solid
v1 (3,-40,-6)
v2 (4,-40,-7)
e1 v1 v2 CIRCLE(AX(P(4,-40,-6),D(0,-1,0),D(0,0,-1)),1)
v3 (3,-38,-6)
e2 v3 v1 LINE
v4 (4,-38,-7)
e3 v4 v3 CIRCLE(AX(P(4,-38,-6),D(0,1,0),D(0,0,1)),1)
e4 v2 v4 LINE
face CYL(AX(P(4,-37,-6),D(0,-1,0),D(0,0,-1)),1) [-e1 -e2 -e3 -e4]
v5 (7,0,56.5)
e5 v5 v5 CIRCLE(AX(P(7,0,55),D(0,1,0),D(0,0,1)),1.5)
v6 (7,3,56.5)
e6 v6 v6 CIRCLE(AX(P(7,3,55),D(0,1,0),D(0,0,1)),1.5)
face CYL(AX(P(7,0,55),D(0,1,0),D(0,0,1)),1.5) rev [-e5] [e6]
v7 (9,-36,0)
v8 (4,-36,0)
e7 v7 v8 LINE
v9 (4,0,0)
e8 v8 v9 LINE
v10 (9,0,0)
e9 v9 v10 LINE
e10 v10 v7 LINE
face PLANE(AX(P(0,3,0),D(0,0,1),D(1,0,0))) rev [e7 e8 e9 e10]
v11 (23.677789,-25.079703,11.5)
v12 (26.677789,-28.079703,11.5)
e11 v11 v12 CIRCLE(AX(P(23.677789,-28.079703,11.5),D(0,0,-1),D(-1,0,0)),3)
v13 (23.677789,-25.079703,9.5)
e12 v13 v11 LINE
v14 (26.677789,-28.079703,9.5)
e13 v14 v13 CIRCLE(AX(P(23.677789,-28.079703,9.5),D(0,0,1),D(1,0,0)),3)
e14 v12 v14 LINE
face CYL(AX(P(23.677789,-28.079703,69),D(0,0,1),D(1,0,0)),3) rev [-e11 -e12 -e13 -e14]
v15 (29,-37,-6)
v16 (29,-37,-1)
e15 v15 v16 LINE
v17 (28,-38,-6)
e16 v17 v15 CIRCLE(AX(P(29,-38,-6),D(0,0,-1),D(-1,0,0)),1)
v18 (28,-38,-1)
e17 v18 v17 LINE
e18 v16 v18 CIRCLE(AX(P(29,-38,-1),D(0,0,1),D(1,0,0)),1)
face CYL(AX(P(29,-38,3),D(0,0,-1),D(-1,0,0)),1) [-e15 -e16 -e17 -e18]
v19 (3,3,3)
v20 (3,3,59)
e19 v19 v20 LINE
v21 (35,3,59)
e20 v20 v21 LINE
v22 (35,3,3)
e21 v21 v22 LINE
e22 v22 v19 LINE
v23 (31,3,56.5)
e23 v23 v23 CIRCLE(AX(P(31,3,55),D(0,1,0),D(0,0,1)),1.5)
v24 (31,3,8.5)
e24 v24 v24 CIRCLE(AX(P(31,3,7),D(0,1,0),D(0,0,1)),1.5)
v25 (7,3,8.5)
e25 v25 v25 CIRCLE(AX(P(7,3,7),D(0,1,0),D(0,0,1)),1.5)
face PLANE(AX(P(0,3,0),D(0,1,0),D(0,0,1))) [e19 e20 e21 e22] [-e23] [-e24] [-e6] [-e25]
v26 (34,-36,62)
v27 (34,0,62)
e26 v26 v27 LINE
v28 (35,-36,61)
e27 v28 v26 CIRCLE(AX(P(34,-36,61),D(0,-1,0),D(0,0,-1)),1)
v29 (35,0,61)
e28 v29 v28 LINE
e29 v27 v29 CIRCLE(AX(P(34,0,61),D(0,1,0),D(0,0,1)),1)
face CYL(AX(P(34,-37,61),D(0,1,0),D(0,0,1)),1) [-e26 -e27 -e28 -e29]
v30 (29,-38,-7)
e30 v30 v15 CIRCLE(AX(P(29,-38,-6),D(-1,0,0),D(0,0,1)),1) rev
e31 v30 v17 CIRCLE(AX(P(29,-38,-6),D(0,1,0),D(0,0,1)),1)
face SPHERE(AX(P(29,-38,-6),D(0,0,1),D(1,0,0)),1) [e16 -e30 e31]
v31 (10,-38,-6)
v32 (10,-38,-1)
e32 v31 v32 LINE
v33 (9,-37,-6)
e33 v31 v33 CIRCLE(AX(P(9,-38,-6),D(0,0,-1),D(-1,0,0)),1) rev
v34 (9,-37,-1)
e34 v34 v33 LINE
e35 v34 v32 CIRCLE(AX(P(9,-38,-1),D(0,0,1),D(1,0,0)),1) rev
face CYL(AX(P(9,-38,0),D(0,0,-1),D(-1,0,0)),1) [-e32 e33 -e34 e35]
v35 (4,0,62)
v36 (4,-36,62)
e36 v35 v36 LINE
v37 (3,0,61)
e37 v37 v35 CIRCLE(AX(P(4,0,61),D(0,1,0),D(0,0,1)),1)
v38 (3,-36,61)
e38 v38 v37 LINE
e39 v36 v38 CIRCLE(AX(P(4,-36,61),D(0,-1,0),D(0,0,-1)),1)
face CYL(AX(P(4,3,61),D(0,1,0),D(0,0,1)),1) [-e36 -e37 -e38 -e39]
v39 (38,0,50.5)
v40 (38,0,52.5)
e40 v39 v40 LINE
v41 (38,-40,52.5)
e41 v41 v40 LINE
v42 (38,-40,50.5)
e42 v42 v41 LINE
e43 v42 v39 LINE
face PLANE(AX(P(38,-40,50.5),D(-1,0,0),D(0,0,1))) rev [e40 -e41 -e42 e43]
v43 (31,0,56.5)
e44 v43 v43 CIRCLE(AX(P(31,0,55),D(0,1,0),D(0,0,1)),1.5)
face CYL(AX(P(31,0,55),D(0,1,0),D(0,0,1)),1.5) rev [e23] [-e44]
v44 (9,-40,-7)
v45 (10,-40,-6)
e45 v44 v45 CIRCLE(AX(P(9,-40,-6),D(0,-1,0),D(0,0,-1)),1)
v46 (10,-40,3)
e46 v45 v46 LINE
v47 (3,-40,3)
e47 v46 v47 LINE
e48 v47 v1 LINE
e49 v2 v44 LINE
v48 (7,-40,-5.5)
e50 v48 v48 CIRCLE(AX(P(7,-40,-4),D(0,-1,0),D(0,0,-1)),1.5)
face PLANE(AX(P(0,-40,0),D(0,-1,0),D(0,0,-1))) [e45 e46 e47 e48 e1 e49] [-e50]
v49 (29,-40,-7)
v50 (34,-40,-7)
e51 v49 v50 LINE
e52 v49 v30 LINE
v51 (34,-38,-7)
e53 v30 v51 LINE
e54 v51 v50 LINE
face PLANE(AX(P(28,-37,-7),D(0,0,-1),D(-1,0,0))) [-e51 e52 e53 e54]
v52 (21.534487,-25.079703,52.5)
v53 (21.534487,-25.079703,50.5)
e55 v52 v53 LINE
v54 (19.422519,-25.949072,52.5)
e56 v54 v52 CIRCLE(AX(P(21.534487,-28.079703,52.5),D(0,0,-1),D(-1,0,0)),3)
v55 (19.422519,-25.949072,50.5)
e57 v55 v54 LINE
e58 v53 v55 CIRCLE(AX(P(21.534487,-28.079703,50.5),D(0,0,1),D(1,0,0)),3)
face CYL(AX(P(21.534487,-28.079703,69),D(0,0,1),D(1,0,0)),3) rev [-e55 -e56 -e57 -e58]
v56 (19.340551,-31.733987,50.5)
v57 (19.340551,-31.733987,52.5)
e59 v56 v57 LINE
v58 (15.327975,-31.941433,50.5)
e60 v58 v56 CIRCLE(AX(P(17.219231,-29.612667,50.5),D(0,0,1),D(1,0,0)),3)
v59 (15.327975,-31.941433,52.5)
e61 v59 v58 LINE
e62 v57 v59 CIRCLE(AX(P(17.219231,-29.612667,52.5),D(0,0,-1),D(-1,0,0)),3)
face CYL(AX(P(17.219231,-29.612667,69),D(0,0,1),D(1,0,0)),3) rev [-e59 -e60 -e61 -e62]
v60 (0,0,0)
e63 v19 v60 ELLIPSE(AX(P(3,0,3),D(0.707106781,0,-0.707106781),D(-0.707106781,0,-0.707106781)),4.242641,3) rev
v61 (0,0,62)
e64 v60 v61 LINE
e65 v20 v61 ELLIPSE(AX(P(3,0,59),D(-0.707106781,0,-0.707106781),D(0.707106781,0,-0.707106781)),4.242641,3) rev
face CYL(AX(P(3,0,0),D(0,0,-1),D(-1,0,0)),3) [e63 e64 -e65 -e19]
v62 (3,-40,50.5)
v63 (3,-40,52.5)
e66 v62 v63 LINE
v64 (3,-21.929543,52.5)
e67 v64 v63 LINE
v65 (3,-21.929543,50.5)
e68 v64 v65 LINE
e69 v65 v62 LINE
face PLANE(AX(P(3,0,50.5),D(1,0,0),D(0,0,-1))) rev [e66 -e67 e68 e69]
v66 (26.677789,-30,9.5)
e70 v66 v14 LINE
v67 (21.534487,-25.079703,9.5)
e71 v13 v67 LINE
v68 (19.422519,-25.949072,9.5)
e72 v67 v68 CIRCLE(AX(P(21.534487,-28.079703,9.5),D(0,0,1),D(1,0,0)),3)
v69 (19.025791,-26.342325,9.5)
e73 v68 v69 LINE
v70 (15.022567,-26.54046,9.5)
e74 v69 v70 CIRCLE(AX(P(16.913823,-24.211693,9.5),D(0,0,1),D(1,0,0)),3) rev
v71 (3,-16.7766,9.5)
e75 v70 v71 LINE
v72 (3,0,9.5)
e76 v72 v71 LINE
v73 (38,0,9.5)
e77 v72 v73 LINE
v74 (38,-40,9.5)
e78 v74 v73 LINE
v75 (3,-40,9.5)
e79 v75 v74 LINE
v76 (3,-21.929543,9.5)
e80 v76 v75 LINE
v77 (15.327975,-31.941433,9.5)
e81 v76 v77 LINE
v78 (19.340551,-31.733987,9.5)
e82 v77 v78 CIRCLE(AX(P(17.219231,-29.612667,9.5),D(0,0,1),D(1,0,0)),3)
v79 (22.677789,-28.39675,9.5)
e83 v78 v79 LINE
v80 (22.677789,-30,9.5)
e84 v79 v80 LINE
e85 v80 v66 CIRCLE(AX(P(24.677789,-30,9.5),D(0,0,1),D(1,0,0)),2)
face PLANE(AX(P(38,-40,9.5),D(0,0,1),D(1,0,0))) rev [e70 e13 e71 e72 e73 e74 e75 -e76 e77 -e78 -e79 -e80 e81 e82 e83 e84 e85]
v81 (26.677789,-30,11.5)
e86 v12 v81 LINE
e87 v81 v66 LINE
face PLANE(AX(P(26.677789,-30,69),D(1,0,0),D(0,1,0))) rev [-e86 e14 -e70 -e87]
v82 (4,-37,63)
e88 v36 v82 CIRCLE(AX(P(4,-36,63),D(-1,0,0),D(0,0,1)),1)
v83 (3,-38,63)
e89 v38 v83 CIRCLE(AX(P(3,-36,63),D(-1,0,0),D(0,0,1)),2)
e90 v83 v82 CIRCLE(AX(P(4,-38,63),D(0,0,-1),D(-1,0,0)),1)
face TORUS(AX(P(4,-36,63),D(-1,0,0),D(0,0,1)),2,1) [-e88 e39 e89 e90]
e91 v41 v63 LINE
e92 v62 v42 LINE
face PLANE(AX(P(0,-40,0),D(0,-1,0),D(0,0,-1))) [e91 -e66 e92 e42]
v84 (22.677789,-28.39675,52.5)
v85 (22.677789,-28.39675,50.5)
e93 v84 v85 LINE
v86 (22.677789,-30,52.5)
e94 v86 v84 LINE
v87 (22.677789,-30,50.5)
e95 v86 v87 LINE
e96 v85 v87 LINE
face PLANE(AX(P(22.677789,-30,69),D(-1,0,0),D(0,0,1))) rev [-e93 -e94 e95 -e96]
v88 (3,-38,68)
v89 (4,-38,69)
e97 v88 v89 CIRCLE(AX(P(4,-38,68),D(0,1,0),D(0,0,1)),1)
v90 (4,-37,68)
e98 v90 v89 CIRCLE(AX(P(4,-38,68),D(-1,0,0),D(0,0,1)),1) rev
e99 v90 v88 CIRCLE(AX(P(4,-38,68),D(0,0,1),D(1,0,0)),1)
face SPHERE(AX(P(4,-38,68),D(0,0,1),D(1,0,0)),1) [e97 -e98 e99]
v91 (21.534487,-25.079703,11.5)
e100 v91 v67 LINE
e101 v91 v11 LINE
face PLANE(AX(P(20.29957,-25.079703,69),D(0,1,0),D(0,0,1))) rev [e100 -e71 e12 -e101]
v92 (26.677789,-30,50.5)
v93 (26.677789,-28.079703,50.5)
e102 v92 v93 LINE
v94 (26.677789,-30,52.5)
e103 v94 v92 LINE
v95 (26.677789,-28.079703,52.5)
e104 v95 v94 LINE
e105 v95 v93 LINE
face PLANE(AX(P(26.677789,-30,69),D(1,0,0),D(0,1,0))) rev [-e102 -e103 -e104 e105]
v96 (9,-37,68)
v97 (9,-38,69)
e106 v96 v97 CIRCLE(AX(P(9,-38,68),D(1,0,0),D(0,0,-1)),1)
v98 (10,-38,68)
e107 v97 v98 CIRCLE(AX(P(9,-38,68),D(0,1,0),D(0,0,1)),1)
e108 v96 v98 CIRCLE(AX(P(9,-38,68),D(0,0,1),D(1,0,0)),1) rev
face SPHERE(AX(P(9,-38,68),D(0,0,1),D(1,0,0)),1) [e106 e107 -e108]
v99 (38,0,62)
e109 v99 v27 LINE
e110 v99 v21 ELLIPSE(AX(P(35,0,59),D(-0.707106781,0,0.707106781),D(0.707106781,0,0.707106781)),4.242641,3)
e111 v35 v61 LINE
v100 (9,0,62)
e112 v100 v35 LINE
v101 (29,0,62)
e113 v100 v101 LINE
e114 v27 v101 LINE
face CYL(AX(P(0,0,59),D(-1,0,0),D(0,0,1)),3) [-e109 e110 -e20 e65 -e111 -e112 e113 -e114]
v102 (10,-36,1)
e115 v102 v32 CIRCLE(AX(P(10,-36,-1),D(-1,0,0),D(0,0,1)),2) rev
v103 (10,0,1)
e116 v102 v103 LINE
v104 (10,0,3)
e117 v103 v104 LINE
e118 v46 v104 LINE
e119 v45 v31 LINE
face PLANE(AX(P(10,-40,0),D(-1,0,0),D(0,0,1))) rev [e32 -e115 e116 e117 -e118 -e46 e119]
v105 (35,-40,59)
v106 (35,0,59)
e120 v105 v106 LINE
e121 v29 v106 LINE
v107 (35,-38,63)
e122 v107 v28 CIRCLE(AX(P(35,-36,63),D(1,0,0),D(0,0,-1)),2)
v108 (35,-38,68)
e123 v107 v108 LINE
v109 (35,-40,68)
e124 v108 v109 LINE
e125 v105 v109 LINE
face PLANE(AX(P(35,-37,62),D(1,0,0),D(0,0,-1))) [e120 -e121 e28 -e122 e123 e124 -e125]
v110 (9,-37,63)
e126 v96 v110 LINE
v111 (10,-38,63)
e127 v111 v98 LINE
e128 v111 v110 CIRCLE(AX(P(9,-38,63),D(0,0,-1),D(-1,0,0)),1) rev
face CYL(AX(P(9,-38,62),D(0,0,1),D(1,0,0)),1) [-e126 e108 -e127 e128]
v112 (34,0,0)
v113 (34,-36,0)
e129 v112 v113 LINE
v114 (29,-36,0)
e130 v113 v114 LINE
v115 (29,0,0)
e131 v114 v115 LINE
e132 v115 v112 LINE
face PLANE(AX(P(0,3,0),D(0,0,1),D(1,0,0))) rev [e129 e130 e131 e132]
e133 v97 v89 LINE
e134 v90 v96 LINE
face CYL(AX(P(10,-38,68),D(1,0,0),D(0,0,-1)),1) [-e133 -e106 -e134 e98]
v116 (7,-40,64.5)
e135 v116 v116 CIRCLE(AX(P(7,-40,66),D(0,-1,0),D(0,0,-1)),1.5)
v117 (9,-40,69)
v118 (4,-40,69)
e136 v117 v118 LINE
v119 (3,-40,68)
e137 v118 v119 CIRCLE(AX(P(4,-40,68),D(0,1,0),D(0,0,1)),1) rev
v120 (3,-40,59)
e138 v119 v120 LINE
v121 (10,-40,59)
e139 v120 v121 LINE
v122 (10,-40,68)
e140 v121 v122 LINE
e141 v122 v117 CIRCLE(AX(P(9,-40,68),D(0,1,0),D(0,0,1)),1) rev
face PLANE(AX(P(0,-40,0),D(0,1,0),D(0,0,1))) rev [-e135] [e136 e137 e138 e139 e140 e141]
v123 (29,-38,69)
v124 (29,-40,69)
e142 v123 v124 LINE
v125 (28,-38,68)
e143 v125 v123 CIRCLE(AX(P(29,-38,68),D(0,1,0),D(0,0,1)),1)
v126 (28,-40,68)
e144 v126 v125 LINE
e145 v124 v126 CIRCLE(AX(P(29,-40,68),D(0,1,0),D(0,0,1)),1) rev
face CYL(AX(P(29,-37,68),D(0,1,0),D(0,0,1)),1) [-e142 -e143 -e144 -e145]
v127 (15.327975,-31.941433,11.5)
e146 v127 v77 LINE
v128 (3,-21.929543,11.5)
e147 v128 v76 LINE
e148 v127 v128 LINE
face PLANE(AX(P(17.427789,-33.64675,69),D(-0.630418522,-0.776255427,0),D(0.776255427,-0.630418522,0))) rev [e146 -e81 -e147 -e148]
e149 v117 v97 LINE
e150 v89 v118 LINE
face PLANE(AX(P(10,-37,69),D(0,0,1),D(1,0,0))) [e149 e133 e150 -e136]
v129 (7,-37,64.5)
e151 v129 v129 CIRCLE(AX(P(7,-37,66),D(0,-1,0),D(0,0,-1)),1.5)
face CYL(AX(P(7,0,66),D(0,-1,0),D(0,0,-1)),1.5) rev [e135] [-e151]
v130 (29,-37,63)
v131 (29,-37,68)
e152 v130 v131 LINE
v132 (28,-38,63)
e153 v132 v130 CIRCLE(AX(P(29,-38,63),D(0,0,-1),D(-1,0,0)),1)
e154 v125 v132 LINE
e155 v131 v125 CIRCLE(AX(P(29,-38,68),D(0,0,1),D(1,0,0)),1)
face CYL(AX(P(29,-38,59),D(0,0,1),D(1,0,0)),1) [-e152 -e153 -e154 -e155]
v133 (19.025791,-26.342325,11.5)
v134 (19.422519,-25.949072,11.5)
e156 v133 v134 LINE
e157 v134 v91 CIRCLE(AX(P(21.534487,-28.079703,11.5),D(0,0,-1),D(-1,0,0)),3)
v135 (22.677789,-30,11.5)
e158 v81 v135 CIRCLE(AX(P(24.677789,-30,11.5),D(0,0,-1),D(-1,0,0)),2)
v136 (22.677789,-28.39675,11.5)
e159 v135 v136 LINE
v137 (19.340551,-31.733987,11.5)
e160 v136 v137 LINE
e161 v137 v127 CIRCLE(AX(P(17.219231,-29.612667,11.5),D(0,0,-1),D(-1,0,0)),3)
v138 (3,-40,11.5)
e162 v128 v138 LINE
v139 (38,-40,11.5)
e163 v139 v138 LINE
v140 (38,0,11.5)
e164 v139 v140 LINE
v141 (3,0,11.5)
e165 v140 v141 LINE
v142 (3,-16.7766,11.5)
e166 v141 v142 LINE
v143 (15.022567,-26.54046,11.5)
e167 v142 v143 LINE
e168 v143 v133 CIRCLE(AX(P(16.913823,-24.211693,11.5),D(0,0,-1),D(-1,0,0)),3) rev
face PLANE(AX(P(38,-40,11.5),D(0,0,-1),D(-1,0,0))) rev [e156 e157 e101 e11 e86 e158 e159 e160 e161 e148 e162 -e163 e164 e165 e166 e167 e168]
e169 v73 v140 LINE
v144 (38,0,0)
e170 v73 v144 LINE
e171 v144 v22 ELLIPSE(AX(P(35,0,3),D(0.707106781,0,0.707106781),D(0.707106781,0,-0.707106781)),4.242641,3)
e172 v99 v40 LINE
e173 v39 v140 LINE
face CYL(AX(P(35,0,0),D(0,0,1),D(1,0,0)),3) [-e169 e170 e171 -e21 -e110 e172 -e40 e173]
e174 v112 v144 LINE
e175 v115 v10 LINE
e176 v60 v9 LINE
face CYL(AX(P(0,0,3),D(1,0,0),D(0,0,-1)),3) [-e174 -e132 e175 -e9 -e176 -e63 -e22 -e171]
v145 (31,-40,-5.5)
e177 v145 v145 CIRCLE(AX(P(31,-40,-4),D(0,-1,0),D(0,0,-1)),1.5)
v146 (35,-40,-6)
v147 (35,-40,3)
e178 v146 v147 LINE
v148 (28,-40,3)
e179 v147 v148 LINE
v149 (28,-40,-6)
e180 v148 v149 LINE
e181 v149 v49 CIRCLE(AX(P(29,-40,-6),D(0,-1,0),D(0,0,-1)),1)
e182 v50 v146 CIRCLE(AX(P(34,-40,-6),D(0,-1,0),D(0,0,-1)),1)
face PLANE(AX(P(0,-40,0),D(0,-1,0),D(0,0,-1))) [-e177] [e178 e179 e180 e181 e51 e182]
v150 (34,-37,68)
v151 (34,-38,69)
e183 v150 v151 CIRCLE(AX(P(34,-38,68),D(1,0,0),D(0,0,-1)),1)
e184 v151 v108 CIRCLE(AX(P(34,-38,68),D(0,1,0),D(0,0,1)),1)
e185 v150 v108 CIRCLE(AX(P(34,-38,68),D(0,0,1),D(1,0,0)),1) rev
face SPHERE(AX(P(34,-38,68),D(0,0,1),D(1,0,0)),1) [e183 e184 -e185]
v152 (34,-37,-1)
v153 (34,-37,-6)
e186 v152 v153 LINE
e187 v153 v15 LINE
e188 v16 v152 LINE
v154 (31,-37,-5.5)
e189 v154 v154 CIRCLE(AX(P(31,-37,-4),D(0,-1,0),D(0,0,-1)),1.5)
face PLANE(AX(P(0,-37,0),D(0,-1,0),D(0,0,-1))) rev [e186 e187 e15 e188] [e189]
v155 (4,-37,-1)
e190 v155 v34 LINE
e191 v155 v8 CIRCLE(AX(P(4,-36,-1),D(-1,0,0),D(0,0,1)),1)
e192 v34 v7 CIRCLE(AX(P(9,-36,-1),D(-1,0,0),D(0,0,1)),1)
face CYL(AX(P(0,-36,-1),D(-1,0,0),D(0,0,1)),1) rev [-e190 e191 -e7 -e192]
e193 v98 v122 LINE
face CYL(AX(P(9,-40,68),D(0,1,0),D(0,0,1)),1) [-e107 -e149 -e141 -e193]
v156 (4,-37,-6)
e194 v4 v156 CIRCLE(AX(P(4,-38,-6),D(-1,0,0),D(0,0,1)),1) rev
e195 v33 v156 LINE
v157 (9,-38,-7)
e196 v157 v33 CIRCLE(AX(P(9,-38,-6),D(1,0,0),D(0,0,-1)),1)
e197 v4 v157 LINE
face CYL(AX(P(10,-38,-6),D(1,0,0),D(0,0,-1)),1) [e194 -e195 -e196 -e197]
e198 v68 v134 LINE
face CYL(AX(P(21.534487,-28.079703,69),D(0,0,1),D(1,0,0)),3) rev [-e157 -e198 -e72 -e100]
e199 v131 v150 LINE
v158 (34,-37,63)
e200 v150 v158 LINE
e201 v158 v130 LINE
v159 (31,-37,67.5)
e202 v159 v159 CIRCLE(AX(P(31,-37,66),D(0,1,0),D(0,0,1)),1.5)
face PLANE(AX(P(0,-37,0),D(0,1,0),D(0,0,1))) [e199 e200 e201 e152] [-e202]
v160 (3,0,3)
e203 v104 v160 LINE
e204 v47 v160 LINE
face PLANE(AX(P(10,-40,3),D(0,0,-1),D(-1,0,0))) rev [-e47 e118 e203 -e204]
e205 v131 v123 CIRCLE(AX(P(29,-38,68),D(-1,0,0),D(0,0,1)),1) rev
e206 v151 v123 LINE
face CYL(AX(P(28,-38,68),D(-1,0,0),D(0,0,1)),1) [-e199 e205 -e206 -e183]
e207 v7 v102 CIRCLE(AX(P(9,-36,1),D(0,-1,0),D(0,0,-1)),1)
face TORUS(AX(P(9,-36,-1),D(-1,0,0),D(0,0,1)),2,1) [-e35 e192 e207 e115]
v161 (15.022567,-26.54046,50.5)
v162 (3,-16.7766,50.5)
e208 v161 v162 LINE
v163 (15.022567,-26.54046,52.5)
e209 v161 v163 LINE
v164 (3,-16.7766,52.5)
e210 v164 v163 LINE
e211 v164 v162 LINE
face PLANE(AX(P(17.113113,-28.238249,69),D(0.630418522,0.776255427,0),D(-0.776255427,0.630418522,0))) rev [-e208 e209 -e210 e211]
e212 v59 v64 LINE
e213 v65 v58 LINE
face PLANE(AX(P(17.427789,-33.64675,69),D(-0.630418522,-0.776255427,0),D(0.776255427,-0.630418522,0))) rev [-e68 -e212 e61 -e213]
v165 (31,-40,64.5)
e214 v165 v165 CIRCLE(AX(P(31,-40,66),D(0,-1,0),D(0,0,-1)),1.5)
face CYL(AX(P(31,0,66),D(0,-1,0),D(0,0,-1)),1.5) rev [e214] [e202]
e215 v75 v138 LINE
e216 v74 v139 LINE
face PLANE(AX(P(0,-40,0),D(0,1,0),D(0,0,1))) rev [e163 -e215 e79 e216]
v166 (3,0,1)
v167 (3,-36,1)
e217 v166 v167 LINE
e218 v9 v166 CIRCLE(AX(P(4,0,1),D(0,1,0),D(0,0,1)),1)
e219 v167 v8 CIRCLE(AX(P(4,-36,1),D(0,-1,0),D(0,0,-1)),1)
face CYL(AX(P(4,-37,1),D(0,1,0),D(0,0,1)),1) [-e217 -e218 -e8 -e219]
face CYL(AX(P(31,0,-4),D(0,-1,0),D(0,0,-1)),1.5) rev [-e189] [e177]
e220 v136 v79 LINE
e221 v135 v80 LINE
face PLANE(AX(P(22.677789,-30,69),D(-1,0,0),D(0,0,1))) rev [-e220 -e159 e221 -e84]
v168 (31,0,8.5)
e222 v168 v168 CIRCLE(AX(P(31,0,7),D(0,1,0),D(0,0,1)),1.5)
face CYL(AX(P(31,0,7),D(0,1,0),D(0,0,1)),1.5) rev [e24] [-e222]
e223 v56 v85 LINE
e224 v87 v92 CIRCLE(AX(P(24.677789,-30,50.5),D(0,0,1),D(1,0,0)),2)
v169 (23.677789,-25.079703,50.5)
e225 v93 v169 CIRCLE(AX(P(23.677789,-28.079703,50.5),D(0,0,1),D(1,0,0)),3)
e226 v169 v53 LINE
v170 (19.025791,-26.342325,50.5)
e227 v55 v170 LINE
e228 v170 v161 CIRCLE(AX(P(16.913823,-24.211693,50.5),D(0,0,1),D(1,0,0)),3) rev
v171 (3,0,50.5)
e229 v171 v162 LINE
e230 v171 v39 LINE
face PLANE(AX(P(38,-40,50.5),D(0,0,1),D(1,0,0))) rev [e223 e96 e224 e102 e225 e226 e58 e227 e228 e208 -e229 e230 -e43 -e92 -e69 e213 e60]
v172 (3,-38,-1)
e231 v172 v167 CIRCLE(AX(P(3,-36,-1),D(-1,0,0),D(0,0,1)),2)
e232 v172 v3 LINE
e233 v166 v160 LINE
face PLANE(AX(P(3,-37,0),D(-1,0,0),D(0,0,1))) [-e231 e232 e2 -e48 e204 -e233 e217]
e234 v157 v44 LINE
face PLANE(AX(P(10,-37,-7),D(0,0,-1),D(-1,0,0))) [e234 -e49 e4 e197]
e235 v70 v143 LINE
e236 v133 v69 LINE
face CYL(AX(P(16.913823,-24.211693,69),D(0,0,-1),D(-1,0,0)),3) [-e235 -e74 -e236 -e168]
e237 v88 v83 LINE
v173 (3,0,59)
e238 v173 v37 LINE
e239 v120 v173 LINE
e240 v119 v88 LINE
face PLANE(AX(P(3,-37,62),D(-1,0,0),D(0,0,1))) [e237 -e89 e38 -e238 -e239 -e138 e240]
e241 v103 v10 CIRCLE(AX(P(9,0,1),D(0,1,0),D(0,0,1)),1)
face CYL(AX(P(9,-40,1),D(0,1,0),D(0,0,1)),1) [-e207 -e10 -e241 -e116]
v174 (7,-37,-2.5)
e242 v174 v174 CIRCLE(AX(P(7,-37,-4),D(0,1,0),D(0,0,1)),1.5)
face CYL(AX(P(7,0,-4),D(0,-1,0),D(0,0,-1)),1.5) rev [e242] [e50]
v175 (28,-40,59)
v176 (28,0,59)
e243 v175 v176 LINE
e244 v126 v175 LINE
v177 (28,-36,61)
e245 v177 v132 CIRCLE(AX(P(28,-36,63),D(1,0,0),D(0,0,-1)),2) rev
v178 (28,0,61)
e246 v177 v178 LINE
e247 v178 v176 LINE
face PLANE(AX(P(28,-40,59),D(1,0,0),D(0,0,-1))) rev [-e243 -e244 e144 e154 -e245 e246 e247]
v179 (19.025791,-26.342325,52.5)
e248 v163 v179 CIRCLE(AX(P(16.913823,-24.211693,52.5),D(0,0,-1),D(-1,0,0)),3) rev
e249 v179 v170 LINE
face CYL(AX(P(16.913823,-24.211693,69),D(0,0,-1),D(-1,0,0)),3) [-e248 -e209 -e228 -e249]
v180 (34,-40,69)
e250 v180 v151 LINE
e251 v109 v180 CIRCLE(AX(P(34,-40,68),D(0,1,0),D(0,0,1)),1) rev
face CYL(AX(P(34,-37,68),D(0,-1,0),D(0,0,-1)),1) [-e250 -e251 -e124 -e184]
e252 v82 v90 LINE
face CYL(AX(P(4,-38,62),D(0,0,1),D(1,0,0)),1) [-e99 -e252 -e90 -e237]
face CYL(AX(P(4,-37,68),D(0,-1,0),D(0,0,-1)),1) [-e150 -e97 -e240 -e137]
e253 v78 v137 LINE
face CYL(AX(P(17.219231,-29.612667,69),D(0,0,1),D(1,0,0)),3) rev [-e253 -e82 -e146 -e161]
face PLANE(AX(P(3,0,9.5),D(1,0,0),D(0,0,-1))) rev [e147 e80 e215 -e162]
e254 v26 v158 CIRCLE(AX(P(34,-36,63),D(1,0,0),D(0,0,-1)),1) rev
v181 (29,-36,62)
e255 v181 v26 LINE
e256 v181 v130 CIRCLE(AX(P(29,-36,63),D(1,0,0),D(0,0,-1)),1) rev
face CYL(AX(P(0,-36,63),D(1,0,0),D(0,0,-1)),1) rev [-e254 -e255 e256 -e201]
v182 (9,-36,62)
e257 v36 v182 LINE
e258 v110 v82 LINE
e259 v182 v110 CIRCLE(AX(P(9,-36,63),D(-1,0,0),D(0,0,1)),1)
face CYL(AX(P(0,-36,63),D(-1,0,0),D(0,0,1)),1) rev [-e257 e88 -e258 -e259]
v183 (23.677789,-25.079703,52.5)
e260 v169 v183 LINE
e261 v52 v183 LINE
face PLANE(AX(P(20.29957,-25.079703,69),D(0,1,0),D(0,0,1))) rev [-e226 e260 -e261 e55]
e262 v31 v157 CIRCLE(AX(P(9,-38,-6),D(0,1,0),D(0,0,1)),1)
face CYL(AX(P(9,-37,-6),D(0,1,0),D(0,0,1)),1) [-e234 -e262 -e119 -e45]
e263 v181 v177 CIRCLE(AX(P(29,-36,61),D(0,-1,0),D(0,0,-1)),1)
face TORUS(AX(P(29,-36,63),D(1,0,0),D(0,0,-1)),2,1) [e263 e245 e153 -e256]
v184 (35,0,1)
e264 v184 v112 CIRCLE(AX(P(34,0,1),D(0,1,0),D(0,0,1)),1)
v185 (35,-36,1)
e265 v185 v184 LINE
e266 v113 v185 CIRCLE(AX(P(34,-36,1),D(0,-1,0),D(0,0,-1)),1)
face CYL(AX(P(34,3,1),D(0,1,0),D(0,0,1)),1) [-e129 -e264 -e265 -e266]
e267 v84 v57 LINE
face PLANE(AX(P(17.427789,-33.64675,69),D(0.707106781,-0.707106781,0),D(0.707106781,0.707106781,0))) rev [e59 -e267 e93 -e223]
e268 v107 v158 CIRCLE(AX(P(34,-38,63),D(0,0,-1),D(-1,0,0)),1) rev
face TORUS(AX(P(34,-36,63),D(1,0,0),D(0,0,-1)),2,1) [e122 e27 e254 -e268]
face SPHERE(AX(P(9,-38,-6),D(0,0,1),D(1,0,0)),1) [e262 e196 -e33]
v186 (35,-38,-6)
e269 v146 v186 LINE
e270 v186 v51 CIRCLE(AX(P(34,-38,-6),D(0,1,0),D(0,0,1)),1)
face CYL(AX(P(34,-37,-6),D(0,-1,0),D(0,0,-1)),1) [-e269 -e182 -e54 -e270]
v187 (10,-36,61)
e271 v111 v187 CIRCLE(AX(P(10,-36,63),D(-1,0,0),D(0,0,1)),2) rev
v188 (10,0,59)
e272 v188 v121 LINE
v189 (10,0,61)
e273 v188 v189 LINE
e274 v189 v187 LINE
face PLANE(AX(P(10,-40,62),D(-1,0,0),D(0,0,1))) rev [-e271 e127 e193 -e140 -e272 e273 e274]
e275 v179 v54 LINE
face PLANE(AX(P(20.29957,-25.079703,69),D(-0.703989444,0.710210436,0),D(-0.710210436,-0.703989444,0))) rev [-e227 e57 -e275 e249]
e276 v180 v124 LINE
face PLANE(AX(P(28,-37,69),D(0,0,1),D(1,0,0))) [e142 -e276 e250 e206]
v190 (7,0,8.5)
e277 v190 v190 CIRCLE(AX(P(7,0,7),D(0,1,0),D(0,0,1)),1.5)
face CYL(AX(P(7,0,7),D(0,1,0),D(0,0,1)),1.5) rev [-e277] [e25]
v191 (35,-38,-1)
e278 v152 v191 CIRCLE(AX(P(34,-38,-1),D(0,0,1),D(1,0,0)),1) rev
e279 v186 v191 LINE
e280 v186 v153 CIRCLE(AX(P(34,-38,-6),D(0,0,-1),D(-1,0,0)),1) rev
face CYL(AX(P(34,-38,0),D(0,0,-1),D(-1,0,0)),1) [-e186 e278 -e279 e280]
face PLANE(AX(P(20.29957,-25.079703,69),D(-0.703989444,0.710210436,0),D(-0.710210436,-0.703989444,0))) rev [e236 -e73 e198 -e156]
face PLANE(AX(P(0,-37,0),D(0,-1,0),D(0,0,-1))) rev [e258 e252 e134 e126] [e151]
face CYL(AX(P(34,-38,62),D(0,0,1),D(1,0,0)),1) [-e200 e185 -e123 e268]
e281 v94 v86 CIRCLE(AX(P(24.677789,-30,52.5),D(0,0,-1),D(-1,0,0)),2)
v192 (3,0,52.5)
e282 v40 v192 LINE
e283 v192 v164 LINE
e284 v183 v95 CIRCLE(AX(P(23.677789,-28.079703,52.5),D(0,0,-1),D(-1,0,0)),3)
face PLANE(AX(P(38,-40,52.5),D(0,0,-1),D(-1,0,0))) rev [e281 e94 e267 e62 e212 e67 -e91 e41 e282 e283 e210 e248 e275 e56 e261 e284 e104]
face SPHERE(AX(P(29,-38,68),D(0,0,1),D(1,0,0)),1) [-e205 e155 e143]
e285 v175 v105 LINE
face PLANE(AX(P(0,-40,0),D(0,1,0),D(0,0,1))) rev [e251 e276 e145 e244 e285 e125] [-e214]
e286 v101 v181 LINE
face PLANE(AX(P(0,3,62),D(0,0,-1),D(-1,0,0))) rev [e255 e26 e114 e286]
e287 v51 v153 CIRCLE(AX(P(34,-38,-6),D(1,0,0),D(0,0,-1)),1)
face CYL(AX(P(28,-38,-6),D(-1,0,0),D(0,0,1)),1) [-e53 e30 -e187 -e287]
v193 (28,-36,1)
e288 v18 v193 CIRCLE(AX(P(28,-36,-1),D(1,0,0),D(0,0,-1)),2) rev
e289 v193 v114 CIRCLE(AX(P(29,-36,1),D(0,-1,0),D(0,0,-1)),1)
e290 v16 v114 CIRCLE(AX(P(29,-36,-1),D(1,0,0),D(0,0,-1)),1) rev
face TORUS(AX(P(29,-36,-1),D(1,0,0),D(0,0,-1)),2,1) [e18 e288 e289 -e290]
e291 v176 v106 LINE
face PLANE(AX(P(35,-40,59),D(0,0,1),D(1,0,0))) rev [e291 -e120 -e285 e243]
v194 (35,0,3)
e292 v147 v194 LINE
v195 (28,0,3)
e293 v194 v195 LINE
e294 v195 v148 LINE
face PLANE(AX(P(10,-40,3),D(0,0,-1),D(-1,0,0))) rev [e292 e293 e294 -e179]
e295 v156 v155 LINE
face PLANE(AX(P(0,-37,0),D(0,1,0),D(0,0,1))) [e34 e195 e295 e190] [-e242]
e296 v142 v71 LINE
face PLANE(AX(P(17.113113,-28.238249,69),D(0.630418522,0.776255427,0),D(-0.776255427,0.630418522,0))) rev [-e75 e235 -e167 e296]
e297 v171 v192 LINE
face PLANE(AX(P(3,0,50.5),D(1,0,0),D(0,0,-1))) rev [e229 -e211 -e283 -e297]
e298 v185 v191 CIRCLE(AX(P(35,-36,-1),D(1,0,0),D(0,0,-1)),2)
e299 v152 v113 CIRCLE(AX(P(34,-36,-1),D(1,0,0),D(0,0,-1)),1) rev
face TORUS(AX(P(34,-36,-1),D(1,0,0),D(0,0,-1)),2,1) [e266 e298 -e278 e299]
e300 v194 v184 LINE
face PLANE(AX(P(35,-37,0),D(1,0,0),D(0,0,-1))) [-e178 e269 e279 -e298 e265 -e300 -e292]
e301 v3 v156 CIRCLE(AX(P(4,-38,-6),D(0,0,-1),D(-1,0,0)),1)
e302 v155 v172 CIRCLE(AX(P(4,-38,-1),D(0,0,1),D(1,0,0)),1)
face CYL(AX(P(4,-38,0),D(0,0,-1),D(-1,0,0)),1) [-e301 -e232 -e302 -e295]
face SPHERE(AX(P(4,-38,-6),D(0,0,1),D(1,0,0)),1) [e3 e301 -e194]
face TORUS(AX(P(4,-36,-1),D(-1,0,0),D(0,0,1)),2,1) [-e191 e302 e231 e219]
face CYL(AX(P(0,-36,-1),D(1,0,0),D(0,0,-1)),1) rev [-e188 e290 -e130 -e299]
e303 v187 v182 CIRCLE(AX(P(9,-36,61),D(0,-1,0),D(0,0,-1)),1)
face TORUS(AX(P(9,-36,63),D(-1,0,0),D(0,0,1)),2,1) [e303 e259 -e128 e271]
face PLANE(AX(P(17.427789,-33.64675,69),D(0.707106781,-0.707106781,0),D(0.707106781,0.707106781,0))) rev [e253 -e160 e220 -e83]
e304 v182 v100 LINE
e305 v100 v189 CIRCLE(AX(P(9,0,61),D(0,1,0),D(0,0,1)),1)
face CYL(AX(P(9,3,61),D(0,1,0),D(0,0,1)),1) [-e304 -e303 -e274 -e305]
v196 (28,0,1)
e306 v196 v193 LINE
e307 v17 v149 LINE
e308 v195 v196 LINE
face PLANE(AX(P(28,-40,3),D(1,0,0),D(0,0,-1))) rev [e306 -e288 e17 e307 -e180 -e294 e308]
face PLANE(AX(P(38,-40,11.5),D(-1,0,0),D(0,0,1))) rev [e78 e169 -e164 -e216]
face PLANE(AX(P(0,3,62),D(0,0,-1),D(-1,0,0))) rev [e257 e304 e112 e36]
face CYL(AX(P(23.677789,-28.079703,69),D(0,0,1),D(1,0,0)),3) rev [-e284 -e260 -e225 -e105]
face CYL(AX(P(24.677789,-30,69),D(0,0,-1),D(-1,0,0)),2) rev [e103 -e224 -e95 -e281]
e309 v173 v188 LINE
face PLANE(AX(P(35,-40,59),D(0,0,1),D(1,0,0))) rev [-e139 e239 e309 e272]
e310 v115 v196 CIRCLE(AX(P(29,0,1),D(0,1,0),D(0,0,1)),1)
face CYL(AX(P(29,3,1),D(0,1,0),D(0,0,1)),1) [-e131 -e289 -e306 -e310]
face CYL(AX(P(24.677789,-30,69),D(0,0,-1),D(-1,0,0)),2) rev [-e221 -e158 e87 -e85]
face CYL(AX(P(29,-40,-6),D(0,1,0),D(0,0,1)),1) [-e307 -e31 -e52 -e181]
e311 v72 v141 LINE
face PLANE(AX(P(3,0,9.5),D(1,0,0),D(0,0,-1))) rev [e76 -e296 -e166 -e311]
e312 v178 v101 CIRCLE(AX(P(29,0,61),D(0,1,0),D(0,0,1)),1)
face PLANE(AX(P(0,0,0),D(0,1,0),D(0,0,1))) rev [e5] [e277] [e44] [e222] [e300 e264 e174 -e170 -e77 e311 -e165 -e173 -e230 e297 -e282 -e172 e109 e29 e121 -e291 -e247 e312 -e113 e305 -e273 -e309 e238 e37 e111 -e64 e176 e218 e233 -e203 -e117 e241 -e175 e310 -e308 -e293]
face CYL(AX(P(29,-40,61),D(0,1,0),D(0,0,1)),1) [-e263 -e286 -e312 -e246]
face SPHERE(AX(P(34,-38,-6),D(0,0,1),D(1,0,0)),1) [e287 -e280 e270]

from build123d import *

# Parameters (mm, degrees)
CROQUIS1_W               = 38
CROQUIS1_H               = 62
SALIENTE_EXTRUIR1_DEPTH  = 3
CROQUIS2_R               = 1.5
CORTAR_EXTRUIR1_DEPTH    = 73.780491892
SALIENTE_EXTRUIR2_DEPTH  = 40
REDONDEO2_DEPTH          = 38
REDONDEO2_START          = -1
REDONDEO2_2_DEPTH        = 64
CROQUIS8_W               = 7
CROQUIS8_H               = 7
SALIENTE_EXTRUIR6_DEPTH  = 3
CROQUIS12_R              = 1.5
CROQUIS12_W              = 3
CROQUIS12_H              = 6
CORTAR_EXTRUIR6_DEPTH    = 40
CROQUIS14_W              = 18
CROQUIS14_H              = 20
SALIENTE_EXTRUIR7_DEPTH  = 3
CROQUIS15_W              = 18
CROQUIS15_H              = 20
SALIENTE_EXTRUIR8_DEPTH  = 3
CROQUIS17_W              = 38
CROQUIS17_H              = 2
SALIENTE_EXTRUIR9_DEPTH  = 40
CORTAR_EXTRUIR7_DEPTH    = 89.345911054
REDONDEO3_R              = 3
CROQUIS18_W              = 3
CROQUIS18_H              = 2
CORTAR_EXTRUIR8_DEPTH    = 40
CROQUIS19_W              = 18
CROQUIS19_H              = 20
CORTAR_EXTRUIR9_DEPTH    = 3
CROQUIS20_W              = 18
CROQUIS20_H              = 20
CORTAR_EXTRUIR10_DEPTH   = 3
SALIENTE_EXTRUIR10_DEPTH = 3
SALIENTE_EXTRUIR11_DEPTH = 3
REDONDEO4_R              = 1


with BuildPart() as part:
    # Croquis1 → Saliente-Extruir1 (new body)
    with BuildSketch(Plane(origin=(0, 0, 0), x_dir=(1, 0, 0), z_dir=(0, 1, 0))):
        with Locations((19, -31)):
            Rectangle(CROQUIS1_W, CROQUIS1_H)
    extrude(amount=SALIENTE_EXTRUIR1_DEPTH)

    # Croquis2 → Cortar-Extruir1 (cut, through all)
    with BuildSketch(Plane(origin=(0, 3, 0), x_dir=(1, 0, 0), z_dir=(0, 1, 0))):
        with Locations(Location((7, -7, 0), (0, 0, 270))):
            Circle(CROQUIS2_R)
        with Locations(Location((31, -7, 0), (0, 0, 270))):
            Circle(CROQUIS2_R)
        with Locations(Location((7, -55, 0), (0, 0, 270))):
            Circle(CROQUIS2_R)
        with Locations(Location((31, -55, 0), (0, 0, 270))):
            Circle(CROQUIS2_R)
    extrude(amount=-CORTAR_EXTRUIR1_DEPTH, mode=Mode.SUBTRACT)

    # Croquis3 → Saliente-Extruir2 (add)
    with BuildSketch(Plane.XZ):
        Polygon((38, 62), (38, 56), (35, 56), (35, 59), (28, 59), (28, 62), align=None)
        Polygon((0, 62), (10, 62), (10, 59), (3, 59), (3, 56), (0, 56), align=None)
        Polygon((0, 6), (0, 0), (10, 0), (10, 3), (3, 3), (3, 6), align=None)
        Polygon((28, 0), (38, 0), (38, 6), (35, 6), (35, 3), (28, 3), align=None)
    extrude(amount=SALIENTE_EXTRUIR2_DEPTH)

    # Redondeo2: read off the stored shape, not the designer's step
    # Redondeo2 outline → Redondeo2 (cut)
    with BuildSketch(Plane.YZ):
        with BuildLine():
            ThreePointArc((0, 62), (2.121320344, 61.121320344), (3, 59))
            Line((3, 59), (3, 62))
            Line((3, 62), (0, 62))
        make_face()
        with BuildLine():
            ThreePointArc((3, 3), (2.121320344, 0.878679656), (0, 0))
            Line((0, 0), (3, 0))
            Line((3, 0), (3, 3))
        make_face()
    extrude(amount=REDONDEO2_DEPTH, mode=Mode.SUBTRACT)

    # Redondeo2 2 outline → Redondeo2 2 (cut)
    with BuildSketch(Plane.XY.offset(REDONDEO2_START)):
        with BuildLine():
            Line((0, 3), (0, 0))
            ThreePointArc((0, 0), (0.878679656, 2.121320344), (3, 3))
            Line((3, 3), (0, 3))
        make_face()
        with BuildLine():
            Line((38, 3), (35, 3))
            ThreePointArc((35, 3), (37.121320344, 2.121320344), (38, 0))
            Line((38, 0), (38, 3))
        make_face()
    extrude(amount=REDONDEO2_2_DEPTH, mode=Mode.SUBTRACT)

    # Croquis8 → Saliente-Extruir6 (add)
    with BuildSketch(Plane.XZ.offset(40)):
        with Locations((6.5, 65.5)):
            Rectangle(CROQUIS8_W, CROQUIS8_H)
        with Locations((31.5, 65.5)):
            Rectangle(CROQUIS8_W, CROQUIS8_H)
        with Locations((31.5, -3.5)):
            Rectangle(CROQUIS8_W, CROQUIS8_H)
        with Locations((6.5, -3.5)):
            Rectangle(CROQUIS8_W, CROQUIS8_H)
    extrude(amount=-SALIENTE_EXTRUIR6_DEPTH)

    # Croquis12 → Cortar-Extruir6 (cut)
    with BuildSketch(Plane.XZ.offset(40)):
        with Locations(Location((7, -4, 0), (0, 0, 270))):
            Circle(CROQUIS12_R)
        with Locations(Location((31, -4, 0), (0, 0, 270))):
            Circle(CROQUIS12_R)
        with Locations(Location((31, 66, 0), (0, 0, 270))):
            Circle(CROQUIS12_R)
        with Locations(Location((7, 66, 0), (0, 0, 270))):
            Circle(CROQUIS12_R)
        with Locations((36.5, 3)):
            Rectangle(CROQUIS12_W, CROQUIS12_H)
        with Locations((36.5, 59)):
            Rectangle(CROQUIS12_W, CROQUIS12_H)
        with Locations((1.5, 59)):
            Rectangle(CROQUIS12_W, CROQUIS12_H)
        with Locations((1.5, 3)):
            Rectangle(CROQUIS12_W, CROQUIS12_H)
    extrude(amount=-CORTAR_EXTRUIR6_DEPTH, mode=Mode.SUBTRACT)

    # Croquis14 → Saliente-Extruir7 (add)
    with BuildSketch(Plane(origin=(0, 0, 59), x_dir=(-1, 0, 0), z_dir=(0, 0, -1))):
        with Locations((-19, -30)):
            Rectangle(CROQUIS14_W, CROQUIS14_H)
    extrude(amount=-SALIENTE_EXTRUIR7_DEPTH)

    # Croquis15 → Saliente-Extruir8 (add)
    with BuildSketch(Plane.XY.offset(3)):
        with Locations((19, -30)):
            Rectangle(CROQUIS15_W, CROQUIS15_H)
    extrude(amount=-SALIENTE_EXTRUIR8_DEPTH)

    # Croquis17 → Saliente-Extruir9 (add)
    with BuildSketch(Plane.XZ):
        with Locations((19, 10.5)):
            Rectangle(CROQUIS17_W, CROQUIS17_H)
        with Locations((19, 51.5)):
            Rectangle(CROQUIS17_W, CROQUIS17_H)
    extrude(amount=SALIENTE_EXTRUIR9_DEPTH)

    # Croquis16 → Cortar-Extruir7 (cut, through all)
    with BuildSketch(Plane(origin=(0, 0, 0), x_dir=(-1, 0, 0), z_dir=(0, 0, -1))):
        with BuildLine():
            Line((-17.42778873, -33.646749521), (-3, -21.929542881))
            Line((-3, -21.929542881), (-3, -16.776599839))
            Line((-3, -16.776599839), (-17.113112675, -28.238249343))
            Line((-17.113112675, -28.238249343), (-20.299570201, -25.079703159))
            Line((-20.299570201, -25.079703159), (-26.67778873, -25.079703159))
            Line((-26.67778873, -25.079703159), (-26.67778873, -30))
            ThreePointArc((-26.67778873, -30), (-24.67778873, -32), (-22.67778873, -30))
            Line((-22.67778873, -30), (-22.67778873, -28.396749521))
            Line((-22.67778873, -28.396749521), (-17.42778873, -33.646749521))
        make_face()
    extrude(amount=-CORTAR_EXTRUIR7_DEPTH, mode=Mode.SUBTRACT)

    # Redondeo3
    redondeo3_edges = [part.edges().sort_by_distance(p)[0] for p in [
        (26.67778873, -25.079703159, 60.5),
        (26.67778873, -25.079703159, 1.5),
        (26.67778873, -25.079703159, 10.5),
        (26.67778873, -25.079703159, 51.5),
        (20.299570201, -25.079703159, 60.5),
        (20.299570201, -25.079703159, 1.5),
        (20.299570201, -25.079703159, 10.5),
        (20.299570201, -25.079703159, 51.5),
        (17.113112675, -28.238249343, 60.5),
        (17.113112675, -28.238249343, 1.5),
        (17.113112675, -28.238249343, 10.5),
        (17.113112675, -28.238249343, 51.5),
        (17.42778873, -33.646749521, 60.5),
        (17.42778873, -33.646749521, 1.5),
        (17.42778873, -33.646749521, 10.5),
        (17.42778873, -33.646749521, 51.5),
    ]]
    fillet(redondeo3_edges, radius=REDONDEO3_R)

    # Croquis18 → Cortar-Extruir8 (cut)
    with BuildSketch(Plane.XZ.offset(40)):
        with Locations((1.5, 51.5)):
            Rectangle(CROQUIS18_W, CROQUIS18_H)
        with Locations((1.5, 10.5)):
            Rectangle(CROQUIS18_W, CROQUIS18_H)
    extrude(amount=-CORTAR_EXTRUIR8_DEPTH, mode=Mode.SUBTRACT)

    # Croquis19 → Cortar-Extruir9 (cut)
    with BuildSketch(Plane(origin=(0, 0, 0), x_dir=(-1, 0, 0), z_dir=(0, 0, -1))):
        with Locations((-19, -30)):
            Rectangle(CROQUIS19_W, CROQUIS19_H)
    extrude(amount=-CORTAR_EXTRUIR9_DEPTH, mode=Mode.SUBTRACT)


with BuildPart() as cortar_extruir9_piece_1:
    # of the separate pieces the step leaves, piece 1, a body of its own (cortar_extruir9_pieces)
    add(part.part.solids().sort_by_distance((3, -16.776599839, 0))[0])

    # Croquis20 → Cortar-Extruir10 (cut)
    with BuildSketch(Plane.XY.offset(62)):
        with Locations((19, -30)):
            Rectangle(CROQUIS20_W, CROQUIS20_H)
    extrude(amount=-CORTAR_EXTRUIR10_DEPTH, mode=Mode.SUBTRACT)


with BuildPart() as cortar_extruir9_piece_2:
    # of the separate pieces the step leaves, piece 2, a body of its own (cortar_extruir9_pieces)
    add(part.part.solids().sort_by_distance((10, -27.614436666, 0))[0])



with BuildPart() as cortar_extruir10_piece_1:
    # of the separate pieces the step leaves, piece 1, a body of its own (cortar_extruir10_pieces)
    add(cortar_extruir9_piece_1.part.solids().sort_by_distance((3, -16.776599839, 0))[0])



with BuildPart() as cortar_extruir10_piece_2:
    # of the separate pieces the step leaves, piece 2, a body of its own (cortar_extruir10_pieces)
    add(cortar_extruir9_piece_1.part.solids().sort_by_distance((10, -27.614436666, 59))[0])


with BuildPart() as cortar_extruir10_piece_1_1:
    add(cortar_extruir10_piece_1.part)

    add(cortar_extruir10_piece_2.part)  # Saliente-Extruir10 merges Cortar-Extruir10 piece 2
    # Croquis21 → Saliente-Extruir10 (add)
    with BuildSketch(Plane.XY.offset(62)):
        Polygon((3, -16.776599839), (3, -21.929542881), (10, -27.614436666), (10, -22.461493624), align=None)
    extrude(amount=-SALIENTE_EXTRUIR10_DEPTH)


with BuildPart() as cortar_extruir9_piece_2_1:
    add(cortar_extruir9_piece_2.part)

    add(cortar_extruir10_piece_1_1.part)  # Saliente-Extruir11 merges Cortar-Extruir10 piece 1
    # Croquis22 → Saliente-Extruir11 (add)
    with BuildSketch(Plane(origin=(0, 0, 0), x_dir=(-1, 0, 0), z_dir=(0, 0, -1))):
        Polygon((-10, -22.461493624), (-3, -16.776599839), (-3, -21.929542881), (-10, -27.614436666), align=None)
    extrude(amount=-SALIENTE_EXTRUIR11_DEPTH)

    # Redondeo4
    # the kernel refuses this fillet: 1 mm, written as the material it adds along each edge
    with BuildSketch(Plane(origin=(10, -37, 0), x_dir=(0, 1, 0), z_dir=(-1, 0, 0)), Plane(origin=(28, -37, 62), x_dir=(0, 1, 0), z_dir=(1, 0, 0))) as redondeo4_piece_1:
        with BuildLine():
            CenterArc((REDONDEO4_R, REDONDEO4_R), REDONDEO4_R, 180, 90)
            Line((0, REDONDEO4_R), (0, 0))
            Line((0, 0), (REDONDEO4_R, 0))
        make_face()
    extrude(amount=7)
    with BuildSketch(Plane(origin=(28, -37, 0), x_dir=(0, 1, 0), z_dir=(1, 0, 0)), Plane(origin=(10, -37, 62), x_dir=(0, 1, 0), z_dir=(-1, 0, 0))) as redondeo4_piece_2:
        with BuildLine():
            CenterArc((REDONDEO4_R, -REDONDEO4_R), REDONDEO4_R, 90, 90)
            Line((0, -REDONDEO4_R), (0, 0))
            Line((0, 0), (REDONDEO4_R, 0))
        make_face()
    extrude(amount=7)
    # the kernel refuses this fillet: 1 mm, written as the material it takes off along each edge
    with BuildSketch(Plane(origin=(0.5, -37, -7), x_dir=(0, -1, 0), z_dir=(1, 0, 0)), Plane(origin=(37.5, -37, 69), x_dir=(0, -1, 0), z_dir=(-1, 0, 0))) as redondeo4_2_piece_1:
        with BuildLine():
            CenterArc((REDONDEO4_R, -REDONDEO4_R), REDONDEO4_R, 90, 90)
            Line((0, -REDONDEO4_R), (0, 0))
            Line((0, 0), (REDONDEO4_R, 0))
        make_face()
    extrude(amount=12, mode=Mode.SUBTRACT)
    with BuildSketch(Plane(origin=(10, -42.5, -7), x_dir=(0, 0, 1), z_dir=(0, 1, 0)), Plane(origin=(28, -42.5, 69), x_dir=(0, 0, -1), z_dir=(0, 1, 0)), Plane(origin=(35, -42.5, -7), x_dir=(0, 0, 1), z_dir=(0, 1, 0)), Plane(origin=(3, -42.5, 69), x_dir=(0, 0, -1), z_dir=(0, 1, 0))) as redondeo4_2_piece_2:
        with BuildLine():
            CenterArc((REDONDEO4_R, -REDONDEO4_R), REDONDEO4_R, 90, 90)
            Line((0, -REDONDEO4_R), (0, 0))
            Line((0, 0), (REDONDEO4_R, 0))
        make_face()
    extrude(amount=8, mode=Mode.SUBTRACT)
    with BuildSketch(Plane(origin=(3, -42.5, -7), x_dir=(0, 0, 1), z_dir=(0, 1, 0)), Plane(origin=(28, -42.5, -7), x_dir=(0, 0, 1), z_dir=(0, 1, 0)), Plane(origin=(10, -42.5, 69), x_dir=(0, 0, -1), z_dir=(0, 1, 0)), Plane(origin=(35, -42.5, 69), x_dir=(0, 0, -1), z_dir=(0, 1, 0))) as redondeo4_2_piece_3:
        with BuildLine():
            CenterArc((REDONDEO4_R, REDONDEO4_R), REDONDEO4_R, 180, 90)
            Line((0, REDONDEO4_R), (0, 0))
            Line((0, 0), (REDONDEO4_R, 0))
        make_face()
    extrude(amount=8, mode=Mode.SUBTRACT)
    with BuildSketch(Plane(origin=(37.5, -37, -7), x_dir=(0, -1, 0), z_dir=(-1, 0, 0)), Plane(origin=(0.5, -37, 69), x_dir=(0, -1, 0), z_dir=(1, 0, 0))) as redondeo4_2_piece_4:
        with BuildLine():
            CenterArc((REDONDEO4_R, REDONDEO4_R), REDONDEO4_R, 180, 90)
            Line((0, REDONDEO4_R), (0, 0))
            Line((0, 0), (REDONDEO4_R, 0))
        make_face()
    extrude(amount=12, mode=Mode.SUBTRACT)
    # the kernel refuses this fillet: 1 mm, written as the material it takes off along each edge
    with BuildSketch(Plane(origin=(34, -38, -6), x_dir=(0, 1, 0), z_dir=(1, 0, 0))) as redondeo4_3_piece_1_section:
        Polygon((0, 0), (REDONDEO4_R, 0), (REDONDEO4_R, -REDONDEO4_R), (0, -REDONDEO4_R), align=None)
    redondeo4_3_piece_1 = extrude(amount=REDONDEO4_R, mode=Mode.PRIVATE)
    redondeo4_3_piece_1 = redondeo4_3_piece_1 - Plane(origin=(34, -38, -6), x_dir=(0, -0.7071067811865475, 0.7071067811865475), z_dir=(1, 0, 0)) * Sphere(REDONDEO4_R, mode=Mode.PRIVATE)
    add(redondeo4_3_piece_1, mode=Mode.SUBTRACT)
    with BuildSketch(Plane(origin=(34, -38, 68), x_dir=(0, 1, 0), z_dir=(1, 0, 0))) as redondeo4_3_piece_2_section:
        Polygon((0, 0), (REDONDEO4_R, 0), (REDONDEO4_R, REDONDEO4_R), (0, REDONDEO4_R), align=None)
    redondeo4_3_piece_2 = extrude(amount=REDONDEO4_R, mode=Mode.PRIVATE)
    redondeo4_3_piece_2 = redondeo4_3_piece_2 - Plane(origin=(34, -38, 68), x_dir=(0, -0.7071067811865475, -0.7071067811865475), z_dir=(1, 0, 0)) * Sphere(REDONDEO4_R, mode=Mode.PRIVATE)
    add(redondeo4_3_piece_2, mode=Mode.SUBTRACT)
    with BuildSketch(Plane(origin=(9, -38, 68), x_dir=(0, 1, 0), z_dir=(1, 0, 0))) as redondeo4_3_piece_3_section:
        Polygon((0, 0), (REDONDEO4_R, 0), (REDONDEO4_R, REDONDEO4_R), (0, REDONDEO4_R), align=None)
    redondeo4_3_piece_3 = extrude(amount=REDONDEO4_R, mode=Mode.PRIVATE)
    redondeo4_3_piece_3 = redondeo4_3_piece_3 - Plane(origin=(9, -38, 68), x_dir=(0, -0.7071067811865475, -0.7071067811865475), z_dir=(1, 0, 0)) * Sphere(REDONDEO4_R, mode=Mode.PRIVATE)
    add(redondeo4_3_piece_3, mode=Mode.SUBTRACT)
    with BuildSketch(Plane(origin=(29, -38, 68), x_dir=(0, 1, 0), z_dir=(-1, 0, 0))) as redondeo4_3_piece_4_section:
        Polygon((0, 0), (REDONDEO4_R, 0), (REDONDEO4_R, -REDONDEO4_R), (0, -REDONDEO4_R), align=None)
    redondeo4_3_piece_4 = extrude(amount=REDONDEO4_R, mode=Mode.PRIVATE)
    redondeo4_3_piece_4 = redondeo4_3_piece_4 - Plane(origin=(29, -38, 68), x_dir=(0, -0.7071067811865475, -0.7071067811865475), z_dir=(-1, 0, 0)) * Sphere(REDONDEO4_R, mode=Mode.PRIVATE)
    add(redondeo4_3_piece_4, mode=Mode.SUBTRACT)
    with BuildSketch(Plane(origin=(29, -38, -6), x_dir=(0, 1, 0), z_dir=(-1, 0, 0))) as redondeo4_3_piece_5_section:
        Polygon((0, 0), (REDONDEO4_R, 0), (REDONDEO4_R, REDONDEO4_R), (0, REDONDEO4_R), align=None)
    redondeo4_3_piece_5 = extrude(amount=REDONDEO4_R, mode=Mode.PRIVATE)
    redondeo4_3_piece_5 = redondeo4_3_piece_5 - Plane(origin=(29, -38, -6), x_dir=(0, -0.7071067811865475, 0.7071067811865475), z_dir=(-1, 0, 0)) * Sphere(REDONDEO4_R, mode=Mode.PRIVATE)
    add(redondeo4_3_piece_5, mode=Mode.SUBTRACT)
    with BuildSketch(Plane(origin=(4, -38, 68), x_dir=(0, 1, 0), z_dir=(-1, 0, 0))) as redondeo4_3_piece_6_section:
        Polygon((0, 0), (REDONDEO4_R, 0), (REDONDEO4_R, -REDONDEO4_R), (0, -REDONDEO4_R), align=None)
    redondeo4_3_piece_6 = extrude(amount=REDONDEO4_R, mode=Mode.PRIVATE)
    redondeo4_3_piece_6 = redondeo4_3_piece_6 - Plane(origin=(4, -38, 68), x_dir=(0, -0.7071067811865475, -0.7071067811865475), z_dir=(-1, 0, 0)) * Sphere(REDONDEO4_R, mode=Mode.PRIVATE)
    add(redondeo4_3_piece_6, mode=Mode.SUBTRACT)
    with BuildSketch(Plane(origin=(4, -38, -6), x_dir=(0, 1, 0), z_dir=(-1, 0, 0))) as redondeo4_3_piece_7_section:
        Polygon((0, 0), (REDONDEO4_R, 0), (REDONDEO4_R, REDONDEO4_R), (0, REDONDEO4_R), align=None)
    redondeo4_3_piece_7 = extrude(amount=REDONDEO4_R, mode=Mode.PRIVATE)
    redondeo4_3_piece_7 = redondeo4_3_piece_7 - Plane(origin=(4, -38, -6), x_dir=(0, -0.7071067811865475, 0.7071067811865475), z_dir=(-1, 0, 0)) * Sphere(REDONDEO4_R, mode=Mode.PRIVATE)
    add(redondeo4_3_piece_7, mode=Mode.SUBTRACT)
    with BuildSketch(Plane(origin=(9, -38, -6), x_dir=(0, 1, 0), z_dir=(1, 0, 0))) as redondeo4_3_piece_8_section:
        Polygon((0, 0), (REDONDEO4_R, 0), (REDONDEO4_R, -REDONDEO4_R), (0, -REDONDEO4_R), align=None)
    redondeo4_3_piece_8 = extrude(amount=REDONDEO4_R, mode=Mode.PRIVATE)
    redondeo4_3_piece_8 = redondeo4_3_piece_8 - Plane(origin=(9, -38, -6), x_dir=(0, -0.7071067811865475, 0.7071067811865475), z_dir=(1, 0, 0)) * Sphere(REDONDEO4_R, mode=Mode.PRIVATE)
    add(redondeo4_3_piece_8, mode=Mode.SUBTRACT)
    with BuildSketch(Plane(origin=(10, -37, -6), x_dir=(0, -1, 0), z_dir=(0, 0, 1)), Plane(origin=(3, -37, -1), x_dir=(0, -1, 0), z_dir=(0, 0, -1)), Plane(origin=(28, -37, 68), x_dir=(0, -1, 0), z_dir=(0, 0, -1)), Plane(origin=(35, -37, 63), x_dir=(0, -1, 0), z_dir=(0, 0, 1))) as redondeo4_3_piece_9:
        with BuildLine():
            CenterArc((REDONDEO4_R, -REDONDEO4_R), REDONDEO4_R, 90, 90)
            Line((0, -REDONDEO4_R), (0, 0))
            Line((0, 0), (REDONDEO4_R, 0))
        make_face()
    extrude(amount=5, mode=Mode.SUBTRACT)
    with BuildSketch(Plane(origin=(3, 0, 0), x_dir=(0, 0, 1), z_dir=(0, -1, 0)), Plane(origin=(10, -36, 0), x_dir=(0, 0, 1), z_dir=(0, 1, 0)), Plane(origin=(35, -36, 0), x_dir=(0, 0, 1), z_dir=(0, 1, 0)), Plane(origin=(28, -36, 62), x_dir=(0, 0, -1), z_dir=(0, 1, 0)), Plane(origin=(3, -36, 62), x_dir=(0, 0, -1), z_dir=(0, 1, 0)), Plane(origin=(10, 0, 62), x_dir=(0, 0, -1), z_dir=(0, -1, 0))) as redondeo4_3_piece_10:
        with BuildLine():
            CenterArc((REDONDEO4_R, -REDONDEO4_R), REDONDEO4_R, 90, 90)
            Line((0, -REDONDEO4_R), (0, 0))
            Line((0, 0), (REDONDEO4_R, 0))
        make_face()
    extrude(amount=36, mode=Mode.SUBTRACT)
    with BuildSketch(Plane(origin=(28, -36, 0), x_dir=(0, 0, 1), z_dir=(0, 1, 0)), Plane(origin=(35, -36, 62), x_dir=(0, 0, -1), z_dir=(0, 1, 0))) as redondeo4_3_piece_11:
        with BuildLine():
            CenterArc((REDONDEO4_R, REDONDEO4_R), REDONDEO4_R, 180, 90)
            Line((0, REDONDEO4_R), (0, 0))
            Line((0, 0), (REDONDEO4_R, 0))
        make_face()
    extrude(amount=36, mode=Mode.SUBTRACT)
    with BuildSketch(Plane(origin=(3, -37, 63), x_dir=(0, -1, 0), z_dir=(0, 0, 1)), Plane(origin=(28, -37, -6), x_dir=(0, -1, 0), z_dir=(0, 0, 1)), Plane(origin=(10, -37, 68), x_dir=(0, -1, 0), z_dir=(0, 0, -1)), Plane(origin=(35, -37, -1), x_dir=(0, -1, 0), z_dir=(0, 0, -1))) as redondeo4_3_piece_12:
        with BuildLine():
            CenterArc((REDONDEO4_R, REDONDEO4_R), REDONDEO4_R, 180, 90)
            Line((0, REDONDEO4_R), (0, 0))
            Line((0, 0), (REDONDEO4_R, 0))
        make_face()
    extrude(amount=5, mode=Mode.SUBTRACT)
    with BuildSketch(Plane(origin=(35, -36, -1), x_dir=(0, 0, 1), z_dir=(0, 1, 0))) as redondeo4_3_piece_13:
        with BuildLine():
            CenterArc((1 + REDONDEO4_R, -REDONDEO4_R), REDONDEO4_R, 90, 90)
            Line((1, -REDONDEO4_R), (1, 0))
            Line((1, 0), (1 + REDONDEO4_R, 0))
        make_face()
    revolve(axis=Axis((35, -36, -1), (1, 0, 0)), revolution_arc=90, mode=Mode.SUBTRACT)
    with BuildSketch(Plane(origin=(35, -36, 63), x_dir=(0, 0, -1), z_dir=(0, 1, 0))) as redondeo4_3_piece_14:
        with BuildLine():
            CenterArc((1 + REDONDEO4_R, REDONDEO4_R), REDONDEO4_R, 180, 90)
            Line((1, REDONDEO4_R), (1, 0))
            Line((1, 0), (1 + REDONDEO4_R, 0))
        make_face()
    revolve(axis=Axis((35, -36, 63), (-1, 0, 0)), revolution_arc=90, mode=Mode.SUBTRACT)
    with BuildSketch(Plane(origin=(10, -36, 63), x_dir=(0, 0, -1), z_dir=(0, 1, 0))) as redondeo4_3_piece_15:
        with BuildLine():
            CenterArc((1 + REDONDEO4_R, REDONDEO4_R), REDONDEO4_R, 180, 90)
            Line((1, REDONDEO4_R), (1, 0))
            Line((1, 0), (1 + REDONDEO4_R, 0))
        make_face()
    revolve(axis=Axis((10, -36, 63), (-1, 0, 0)), revolution_arc=90, mode=Mode.SUBTRACT)
    with BuildSketch(Plane(origin=(3, -36, 63), x_dir=(0, 0, -1), z_dir=(0, 1, 0))) as redondeo4_3_piece_16:
        with BuildLine():
            CenterArc((1 + REDONDEO4_R, -REDONDEO4_R), REDONDEO4_R, 90, 90)
            Line((1, -REDONDEO4_R), (1, 0))
            Line((1, 0), (1 + REDONDEO4_R, 0))
        make_face()
    revolve(axis=Axis((3, -36, 63), (-1, 0, 0)), revolution_arc=90, mode=Mode.SUBTRACT)
    with BuildSketch(Plane(origin=(28, -36, 63), x_dir=(0, 0, -1), z_dir=(0, 1, 0))) as redondeo4_3_piece_17:
        with BuildLine():
            CenterArc((1 + REDONDEO4_R, -REDONDEO4_R), REDONDEO4_R, 90, 90)
            Line((1, -REDONDEO4_R), (1, 0))
            Line((1, 0), (1 + REDONDEO4_R, 0))
        make_face()
    revolve(axis=Axis((28, -36, 63), (-1, 0, 0)), revolution_arc=90, mode=Mode.SUBTRACT)
    with BuildSketch(Plane(origin=(28, -36, -1), x_dir=(0, 0, 1), z_dir=(0, 1, 0))) as redondeo4_3_piece_18:
        with BuildLine():
            CenterArc((1 + REDONDEO4_R, REDONDEO4_R), REDONDEO4_R, 180, 90)
            Line((1, REDONDEO4_R), (1, 0))
            Line((1, 0), (1 + REDONDEO4_R, 0))
        make_face()
    revolve(axis=Axis((28, -36, -1), (1, 0, 0)), revolution_arc=90, mode=Mode.SUBTRACT)
    with BuildSketch(Plane(origin=(10, -36, -1), x_dir=(0, 0, 1), z_dir=(0, 1, 0))) as redondeo4_3_piece_19:
        with BuildLine():
            CenterArc((1 + REDONDEO4_R, -REDONDEO4_R), REDONDEO4_R, 90, 90)
            Line((1, -REDONDEO4_R), (1, 0))
            Line((1, 0), (1 + REDONDEO4_R, 0))
        make_face()
    revolve(axis=Axis((10, -36, -1), (1, 0, 0)), revolution_arc=90, mode=Mode.SUBTRACT)
    with BuildSketch(Plane(origin=(3, -36, -1), x_dir=(0, 0, 1), z_dir=(0, 1, 0))) as redondeo4_3_piece_20:
        with BuildLine():
            CenterArc((1 + REDONDEO4_R, REDONDEO4_R), REDONDEO4_R, 180, 90)
            Line((1, REDONDEO4_R), (1, 0))
            Line((1, 0), (1 + REDONDEO4_R, 0))
        make_face()
    revolve(axis=Axis((3, -36, -1), (1, 0, 0)), revolution_arc=90, mode=Mode.SUBTRACT)


solid = cortar_extruir9_piece_2_1.part
